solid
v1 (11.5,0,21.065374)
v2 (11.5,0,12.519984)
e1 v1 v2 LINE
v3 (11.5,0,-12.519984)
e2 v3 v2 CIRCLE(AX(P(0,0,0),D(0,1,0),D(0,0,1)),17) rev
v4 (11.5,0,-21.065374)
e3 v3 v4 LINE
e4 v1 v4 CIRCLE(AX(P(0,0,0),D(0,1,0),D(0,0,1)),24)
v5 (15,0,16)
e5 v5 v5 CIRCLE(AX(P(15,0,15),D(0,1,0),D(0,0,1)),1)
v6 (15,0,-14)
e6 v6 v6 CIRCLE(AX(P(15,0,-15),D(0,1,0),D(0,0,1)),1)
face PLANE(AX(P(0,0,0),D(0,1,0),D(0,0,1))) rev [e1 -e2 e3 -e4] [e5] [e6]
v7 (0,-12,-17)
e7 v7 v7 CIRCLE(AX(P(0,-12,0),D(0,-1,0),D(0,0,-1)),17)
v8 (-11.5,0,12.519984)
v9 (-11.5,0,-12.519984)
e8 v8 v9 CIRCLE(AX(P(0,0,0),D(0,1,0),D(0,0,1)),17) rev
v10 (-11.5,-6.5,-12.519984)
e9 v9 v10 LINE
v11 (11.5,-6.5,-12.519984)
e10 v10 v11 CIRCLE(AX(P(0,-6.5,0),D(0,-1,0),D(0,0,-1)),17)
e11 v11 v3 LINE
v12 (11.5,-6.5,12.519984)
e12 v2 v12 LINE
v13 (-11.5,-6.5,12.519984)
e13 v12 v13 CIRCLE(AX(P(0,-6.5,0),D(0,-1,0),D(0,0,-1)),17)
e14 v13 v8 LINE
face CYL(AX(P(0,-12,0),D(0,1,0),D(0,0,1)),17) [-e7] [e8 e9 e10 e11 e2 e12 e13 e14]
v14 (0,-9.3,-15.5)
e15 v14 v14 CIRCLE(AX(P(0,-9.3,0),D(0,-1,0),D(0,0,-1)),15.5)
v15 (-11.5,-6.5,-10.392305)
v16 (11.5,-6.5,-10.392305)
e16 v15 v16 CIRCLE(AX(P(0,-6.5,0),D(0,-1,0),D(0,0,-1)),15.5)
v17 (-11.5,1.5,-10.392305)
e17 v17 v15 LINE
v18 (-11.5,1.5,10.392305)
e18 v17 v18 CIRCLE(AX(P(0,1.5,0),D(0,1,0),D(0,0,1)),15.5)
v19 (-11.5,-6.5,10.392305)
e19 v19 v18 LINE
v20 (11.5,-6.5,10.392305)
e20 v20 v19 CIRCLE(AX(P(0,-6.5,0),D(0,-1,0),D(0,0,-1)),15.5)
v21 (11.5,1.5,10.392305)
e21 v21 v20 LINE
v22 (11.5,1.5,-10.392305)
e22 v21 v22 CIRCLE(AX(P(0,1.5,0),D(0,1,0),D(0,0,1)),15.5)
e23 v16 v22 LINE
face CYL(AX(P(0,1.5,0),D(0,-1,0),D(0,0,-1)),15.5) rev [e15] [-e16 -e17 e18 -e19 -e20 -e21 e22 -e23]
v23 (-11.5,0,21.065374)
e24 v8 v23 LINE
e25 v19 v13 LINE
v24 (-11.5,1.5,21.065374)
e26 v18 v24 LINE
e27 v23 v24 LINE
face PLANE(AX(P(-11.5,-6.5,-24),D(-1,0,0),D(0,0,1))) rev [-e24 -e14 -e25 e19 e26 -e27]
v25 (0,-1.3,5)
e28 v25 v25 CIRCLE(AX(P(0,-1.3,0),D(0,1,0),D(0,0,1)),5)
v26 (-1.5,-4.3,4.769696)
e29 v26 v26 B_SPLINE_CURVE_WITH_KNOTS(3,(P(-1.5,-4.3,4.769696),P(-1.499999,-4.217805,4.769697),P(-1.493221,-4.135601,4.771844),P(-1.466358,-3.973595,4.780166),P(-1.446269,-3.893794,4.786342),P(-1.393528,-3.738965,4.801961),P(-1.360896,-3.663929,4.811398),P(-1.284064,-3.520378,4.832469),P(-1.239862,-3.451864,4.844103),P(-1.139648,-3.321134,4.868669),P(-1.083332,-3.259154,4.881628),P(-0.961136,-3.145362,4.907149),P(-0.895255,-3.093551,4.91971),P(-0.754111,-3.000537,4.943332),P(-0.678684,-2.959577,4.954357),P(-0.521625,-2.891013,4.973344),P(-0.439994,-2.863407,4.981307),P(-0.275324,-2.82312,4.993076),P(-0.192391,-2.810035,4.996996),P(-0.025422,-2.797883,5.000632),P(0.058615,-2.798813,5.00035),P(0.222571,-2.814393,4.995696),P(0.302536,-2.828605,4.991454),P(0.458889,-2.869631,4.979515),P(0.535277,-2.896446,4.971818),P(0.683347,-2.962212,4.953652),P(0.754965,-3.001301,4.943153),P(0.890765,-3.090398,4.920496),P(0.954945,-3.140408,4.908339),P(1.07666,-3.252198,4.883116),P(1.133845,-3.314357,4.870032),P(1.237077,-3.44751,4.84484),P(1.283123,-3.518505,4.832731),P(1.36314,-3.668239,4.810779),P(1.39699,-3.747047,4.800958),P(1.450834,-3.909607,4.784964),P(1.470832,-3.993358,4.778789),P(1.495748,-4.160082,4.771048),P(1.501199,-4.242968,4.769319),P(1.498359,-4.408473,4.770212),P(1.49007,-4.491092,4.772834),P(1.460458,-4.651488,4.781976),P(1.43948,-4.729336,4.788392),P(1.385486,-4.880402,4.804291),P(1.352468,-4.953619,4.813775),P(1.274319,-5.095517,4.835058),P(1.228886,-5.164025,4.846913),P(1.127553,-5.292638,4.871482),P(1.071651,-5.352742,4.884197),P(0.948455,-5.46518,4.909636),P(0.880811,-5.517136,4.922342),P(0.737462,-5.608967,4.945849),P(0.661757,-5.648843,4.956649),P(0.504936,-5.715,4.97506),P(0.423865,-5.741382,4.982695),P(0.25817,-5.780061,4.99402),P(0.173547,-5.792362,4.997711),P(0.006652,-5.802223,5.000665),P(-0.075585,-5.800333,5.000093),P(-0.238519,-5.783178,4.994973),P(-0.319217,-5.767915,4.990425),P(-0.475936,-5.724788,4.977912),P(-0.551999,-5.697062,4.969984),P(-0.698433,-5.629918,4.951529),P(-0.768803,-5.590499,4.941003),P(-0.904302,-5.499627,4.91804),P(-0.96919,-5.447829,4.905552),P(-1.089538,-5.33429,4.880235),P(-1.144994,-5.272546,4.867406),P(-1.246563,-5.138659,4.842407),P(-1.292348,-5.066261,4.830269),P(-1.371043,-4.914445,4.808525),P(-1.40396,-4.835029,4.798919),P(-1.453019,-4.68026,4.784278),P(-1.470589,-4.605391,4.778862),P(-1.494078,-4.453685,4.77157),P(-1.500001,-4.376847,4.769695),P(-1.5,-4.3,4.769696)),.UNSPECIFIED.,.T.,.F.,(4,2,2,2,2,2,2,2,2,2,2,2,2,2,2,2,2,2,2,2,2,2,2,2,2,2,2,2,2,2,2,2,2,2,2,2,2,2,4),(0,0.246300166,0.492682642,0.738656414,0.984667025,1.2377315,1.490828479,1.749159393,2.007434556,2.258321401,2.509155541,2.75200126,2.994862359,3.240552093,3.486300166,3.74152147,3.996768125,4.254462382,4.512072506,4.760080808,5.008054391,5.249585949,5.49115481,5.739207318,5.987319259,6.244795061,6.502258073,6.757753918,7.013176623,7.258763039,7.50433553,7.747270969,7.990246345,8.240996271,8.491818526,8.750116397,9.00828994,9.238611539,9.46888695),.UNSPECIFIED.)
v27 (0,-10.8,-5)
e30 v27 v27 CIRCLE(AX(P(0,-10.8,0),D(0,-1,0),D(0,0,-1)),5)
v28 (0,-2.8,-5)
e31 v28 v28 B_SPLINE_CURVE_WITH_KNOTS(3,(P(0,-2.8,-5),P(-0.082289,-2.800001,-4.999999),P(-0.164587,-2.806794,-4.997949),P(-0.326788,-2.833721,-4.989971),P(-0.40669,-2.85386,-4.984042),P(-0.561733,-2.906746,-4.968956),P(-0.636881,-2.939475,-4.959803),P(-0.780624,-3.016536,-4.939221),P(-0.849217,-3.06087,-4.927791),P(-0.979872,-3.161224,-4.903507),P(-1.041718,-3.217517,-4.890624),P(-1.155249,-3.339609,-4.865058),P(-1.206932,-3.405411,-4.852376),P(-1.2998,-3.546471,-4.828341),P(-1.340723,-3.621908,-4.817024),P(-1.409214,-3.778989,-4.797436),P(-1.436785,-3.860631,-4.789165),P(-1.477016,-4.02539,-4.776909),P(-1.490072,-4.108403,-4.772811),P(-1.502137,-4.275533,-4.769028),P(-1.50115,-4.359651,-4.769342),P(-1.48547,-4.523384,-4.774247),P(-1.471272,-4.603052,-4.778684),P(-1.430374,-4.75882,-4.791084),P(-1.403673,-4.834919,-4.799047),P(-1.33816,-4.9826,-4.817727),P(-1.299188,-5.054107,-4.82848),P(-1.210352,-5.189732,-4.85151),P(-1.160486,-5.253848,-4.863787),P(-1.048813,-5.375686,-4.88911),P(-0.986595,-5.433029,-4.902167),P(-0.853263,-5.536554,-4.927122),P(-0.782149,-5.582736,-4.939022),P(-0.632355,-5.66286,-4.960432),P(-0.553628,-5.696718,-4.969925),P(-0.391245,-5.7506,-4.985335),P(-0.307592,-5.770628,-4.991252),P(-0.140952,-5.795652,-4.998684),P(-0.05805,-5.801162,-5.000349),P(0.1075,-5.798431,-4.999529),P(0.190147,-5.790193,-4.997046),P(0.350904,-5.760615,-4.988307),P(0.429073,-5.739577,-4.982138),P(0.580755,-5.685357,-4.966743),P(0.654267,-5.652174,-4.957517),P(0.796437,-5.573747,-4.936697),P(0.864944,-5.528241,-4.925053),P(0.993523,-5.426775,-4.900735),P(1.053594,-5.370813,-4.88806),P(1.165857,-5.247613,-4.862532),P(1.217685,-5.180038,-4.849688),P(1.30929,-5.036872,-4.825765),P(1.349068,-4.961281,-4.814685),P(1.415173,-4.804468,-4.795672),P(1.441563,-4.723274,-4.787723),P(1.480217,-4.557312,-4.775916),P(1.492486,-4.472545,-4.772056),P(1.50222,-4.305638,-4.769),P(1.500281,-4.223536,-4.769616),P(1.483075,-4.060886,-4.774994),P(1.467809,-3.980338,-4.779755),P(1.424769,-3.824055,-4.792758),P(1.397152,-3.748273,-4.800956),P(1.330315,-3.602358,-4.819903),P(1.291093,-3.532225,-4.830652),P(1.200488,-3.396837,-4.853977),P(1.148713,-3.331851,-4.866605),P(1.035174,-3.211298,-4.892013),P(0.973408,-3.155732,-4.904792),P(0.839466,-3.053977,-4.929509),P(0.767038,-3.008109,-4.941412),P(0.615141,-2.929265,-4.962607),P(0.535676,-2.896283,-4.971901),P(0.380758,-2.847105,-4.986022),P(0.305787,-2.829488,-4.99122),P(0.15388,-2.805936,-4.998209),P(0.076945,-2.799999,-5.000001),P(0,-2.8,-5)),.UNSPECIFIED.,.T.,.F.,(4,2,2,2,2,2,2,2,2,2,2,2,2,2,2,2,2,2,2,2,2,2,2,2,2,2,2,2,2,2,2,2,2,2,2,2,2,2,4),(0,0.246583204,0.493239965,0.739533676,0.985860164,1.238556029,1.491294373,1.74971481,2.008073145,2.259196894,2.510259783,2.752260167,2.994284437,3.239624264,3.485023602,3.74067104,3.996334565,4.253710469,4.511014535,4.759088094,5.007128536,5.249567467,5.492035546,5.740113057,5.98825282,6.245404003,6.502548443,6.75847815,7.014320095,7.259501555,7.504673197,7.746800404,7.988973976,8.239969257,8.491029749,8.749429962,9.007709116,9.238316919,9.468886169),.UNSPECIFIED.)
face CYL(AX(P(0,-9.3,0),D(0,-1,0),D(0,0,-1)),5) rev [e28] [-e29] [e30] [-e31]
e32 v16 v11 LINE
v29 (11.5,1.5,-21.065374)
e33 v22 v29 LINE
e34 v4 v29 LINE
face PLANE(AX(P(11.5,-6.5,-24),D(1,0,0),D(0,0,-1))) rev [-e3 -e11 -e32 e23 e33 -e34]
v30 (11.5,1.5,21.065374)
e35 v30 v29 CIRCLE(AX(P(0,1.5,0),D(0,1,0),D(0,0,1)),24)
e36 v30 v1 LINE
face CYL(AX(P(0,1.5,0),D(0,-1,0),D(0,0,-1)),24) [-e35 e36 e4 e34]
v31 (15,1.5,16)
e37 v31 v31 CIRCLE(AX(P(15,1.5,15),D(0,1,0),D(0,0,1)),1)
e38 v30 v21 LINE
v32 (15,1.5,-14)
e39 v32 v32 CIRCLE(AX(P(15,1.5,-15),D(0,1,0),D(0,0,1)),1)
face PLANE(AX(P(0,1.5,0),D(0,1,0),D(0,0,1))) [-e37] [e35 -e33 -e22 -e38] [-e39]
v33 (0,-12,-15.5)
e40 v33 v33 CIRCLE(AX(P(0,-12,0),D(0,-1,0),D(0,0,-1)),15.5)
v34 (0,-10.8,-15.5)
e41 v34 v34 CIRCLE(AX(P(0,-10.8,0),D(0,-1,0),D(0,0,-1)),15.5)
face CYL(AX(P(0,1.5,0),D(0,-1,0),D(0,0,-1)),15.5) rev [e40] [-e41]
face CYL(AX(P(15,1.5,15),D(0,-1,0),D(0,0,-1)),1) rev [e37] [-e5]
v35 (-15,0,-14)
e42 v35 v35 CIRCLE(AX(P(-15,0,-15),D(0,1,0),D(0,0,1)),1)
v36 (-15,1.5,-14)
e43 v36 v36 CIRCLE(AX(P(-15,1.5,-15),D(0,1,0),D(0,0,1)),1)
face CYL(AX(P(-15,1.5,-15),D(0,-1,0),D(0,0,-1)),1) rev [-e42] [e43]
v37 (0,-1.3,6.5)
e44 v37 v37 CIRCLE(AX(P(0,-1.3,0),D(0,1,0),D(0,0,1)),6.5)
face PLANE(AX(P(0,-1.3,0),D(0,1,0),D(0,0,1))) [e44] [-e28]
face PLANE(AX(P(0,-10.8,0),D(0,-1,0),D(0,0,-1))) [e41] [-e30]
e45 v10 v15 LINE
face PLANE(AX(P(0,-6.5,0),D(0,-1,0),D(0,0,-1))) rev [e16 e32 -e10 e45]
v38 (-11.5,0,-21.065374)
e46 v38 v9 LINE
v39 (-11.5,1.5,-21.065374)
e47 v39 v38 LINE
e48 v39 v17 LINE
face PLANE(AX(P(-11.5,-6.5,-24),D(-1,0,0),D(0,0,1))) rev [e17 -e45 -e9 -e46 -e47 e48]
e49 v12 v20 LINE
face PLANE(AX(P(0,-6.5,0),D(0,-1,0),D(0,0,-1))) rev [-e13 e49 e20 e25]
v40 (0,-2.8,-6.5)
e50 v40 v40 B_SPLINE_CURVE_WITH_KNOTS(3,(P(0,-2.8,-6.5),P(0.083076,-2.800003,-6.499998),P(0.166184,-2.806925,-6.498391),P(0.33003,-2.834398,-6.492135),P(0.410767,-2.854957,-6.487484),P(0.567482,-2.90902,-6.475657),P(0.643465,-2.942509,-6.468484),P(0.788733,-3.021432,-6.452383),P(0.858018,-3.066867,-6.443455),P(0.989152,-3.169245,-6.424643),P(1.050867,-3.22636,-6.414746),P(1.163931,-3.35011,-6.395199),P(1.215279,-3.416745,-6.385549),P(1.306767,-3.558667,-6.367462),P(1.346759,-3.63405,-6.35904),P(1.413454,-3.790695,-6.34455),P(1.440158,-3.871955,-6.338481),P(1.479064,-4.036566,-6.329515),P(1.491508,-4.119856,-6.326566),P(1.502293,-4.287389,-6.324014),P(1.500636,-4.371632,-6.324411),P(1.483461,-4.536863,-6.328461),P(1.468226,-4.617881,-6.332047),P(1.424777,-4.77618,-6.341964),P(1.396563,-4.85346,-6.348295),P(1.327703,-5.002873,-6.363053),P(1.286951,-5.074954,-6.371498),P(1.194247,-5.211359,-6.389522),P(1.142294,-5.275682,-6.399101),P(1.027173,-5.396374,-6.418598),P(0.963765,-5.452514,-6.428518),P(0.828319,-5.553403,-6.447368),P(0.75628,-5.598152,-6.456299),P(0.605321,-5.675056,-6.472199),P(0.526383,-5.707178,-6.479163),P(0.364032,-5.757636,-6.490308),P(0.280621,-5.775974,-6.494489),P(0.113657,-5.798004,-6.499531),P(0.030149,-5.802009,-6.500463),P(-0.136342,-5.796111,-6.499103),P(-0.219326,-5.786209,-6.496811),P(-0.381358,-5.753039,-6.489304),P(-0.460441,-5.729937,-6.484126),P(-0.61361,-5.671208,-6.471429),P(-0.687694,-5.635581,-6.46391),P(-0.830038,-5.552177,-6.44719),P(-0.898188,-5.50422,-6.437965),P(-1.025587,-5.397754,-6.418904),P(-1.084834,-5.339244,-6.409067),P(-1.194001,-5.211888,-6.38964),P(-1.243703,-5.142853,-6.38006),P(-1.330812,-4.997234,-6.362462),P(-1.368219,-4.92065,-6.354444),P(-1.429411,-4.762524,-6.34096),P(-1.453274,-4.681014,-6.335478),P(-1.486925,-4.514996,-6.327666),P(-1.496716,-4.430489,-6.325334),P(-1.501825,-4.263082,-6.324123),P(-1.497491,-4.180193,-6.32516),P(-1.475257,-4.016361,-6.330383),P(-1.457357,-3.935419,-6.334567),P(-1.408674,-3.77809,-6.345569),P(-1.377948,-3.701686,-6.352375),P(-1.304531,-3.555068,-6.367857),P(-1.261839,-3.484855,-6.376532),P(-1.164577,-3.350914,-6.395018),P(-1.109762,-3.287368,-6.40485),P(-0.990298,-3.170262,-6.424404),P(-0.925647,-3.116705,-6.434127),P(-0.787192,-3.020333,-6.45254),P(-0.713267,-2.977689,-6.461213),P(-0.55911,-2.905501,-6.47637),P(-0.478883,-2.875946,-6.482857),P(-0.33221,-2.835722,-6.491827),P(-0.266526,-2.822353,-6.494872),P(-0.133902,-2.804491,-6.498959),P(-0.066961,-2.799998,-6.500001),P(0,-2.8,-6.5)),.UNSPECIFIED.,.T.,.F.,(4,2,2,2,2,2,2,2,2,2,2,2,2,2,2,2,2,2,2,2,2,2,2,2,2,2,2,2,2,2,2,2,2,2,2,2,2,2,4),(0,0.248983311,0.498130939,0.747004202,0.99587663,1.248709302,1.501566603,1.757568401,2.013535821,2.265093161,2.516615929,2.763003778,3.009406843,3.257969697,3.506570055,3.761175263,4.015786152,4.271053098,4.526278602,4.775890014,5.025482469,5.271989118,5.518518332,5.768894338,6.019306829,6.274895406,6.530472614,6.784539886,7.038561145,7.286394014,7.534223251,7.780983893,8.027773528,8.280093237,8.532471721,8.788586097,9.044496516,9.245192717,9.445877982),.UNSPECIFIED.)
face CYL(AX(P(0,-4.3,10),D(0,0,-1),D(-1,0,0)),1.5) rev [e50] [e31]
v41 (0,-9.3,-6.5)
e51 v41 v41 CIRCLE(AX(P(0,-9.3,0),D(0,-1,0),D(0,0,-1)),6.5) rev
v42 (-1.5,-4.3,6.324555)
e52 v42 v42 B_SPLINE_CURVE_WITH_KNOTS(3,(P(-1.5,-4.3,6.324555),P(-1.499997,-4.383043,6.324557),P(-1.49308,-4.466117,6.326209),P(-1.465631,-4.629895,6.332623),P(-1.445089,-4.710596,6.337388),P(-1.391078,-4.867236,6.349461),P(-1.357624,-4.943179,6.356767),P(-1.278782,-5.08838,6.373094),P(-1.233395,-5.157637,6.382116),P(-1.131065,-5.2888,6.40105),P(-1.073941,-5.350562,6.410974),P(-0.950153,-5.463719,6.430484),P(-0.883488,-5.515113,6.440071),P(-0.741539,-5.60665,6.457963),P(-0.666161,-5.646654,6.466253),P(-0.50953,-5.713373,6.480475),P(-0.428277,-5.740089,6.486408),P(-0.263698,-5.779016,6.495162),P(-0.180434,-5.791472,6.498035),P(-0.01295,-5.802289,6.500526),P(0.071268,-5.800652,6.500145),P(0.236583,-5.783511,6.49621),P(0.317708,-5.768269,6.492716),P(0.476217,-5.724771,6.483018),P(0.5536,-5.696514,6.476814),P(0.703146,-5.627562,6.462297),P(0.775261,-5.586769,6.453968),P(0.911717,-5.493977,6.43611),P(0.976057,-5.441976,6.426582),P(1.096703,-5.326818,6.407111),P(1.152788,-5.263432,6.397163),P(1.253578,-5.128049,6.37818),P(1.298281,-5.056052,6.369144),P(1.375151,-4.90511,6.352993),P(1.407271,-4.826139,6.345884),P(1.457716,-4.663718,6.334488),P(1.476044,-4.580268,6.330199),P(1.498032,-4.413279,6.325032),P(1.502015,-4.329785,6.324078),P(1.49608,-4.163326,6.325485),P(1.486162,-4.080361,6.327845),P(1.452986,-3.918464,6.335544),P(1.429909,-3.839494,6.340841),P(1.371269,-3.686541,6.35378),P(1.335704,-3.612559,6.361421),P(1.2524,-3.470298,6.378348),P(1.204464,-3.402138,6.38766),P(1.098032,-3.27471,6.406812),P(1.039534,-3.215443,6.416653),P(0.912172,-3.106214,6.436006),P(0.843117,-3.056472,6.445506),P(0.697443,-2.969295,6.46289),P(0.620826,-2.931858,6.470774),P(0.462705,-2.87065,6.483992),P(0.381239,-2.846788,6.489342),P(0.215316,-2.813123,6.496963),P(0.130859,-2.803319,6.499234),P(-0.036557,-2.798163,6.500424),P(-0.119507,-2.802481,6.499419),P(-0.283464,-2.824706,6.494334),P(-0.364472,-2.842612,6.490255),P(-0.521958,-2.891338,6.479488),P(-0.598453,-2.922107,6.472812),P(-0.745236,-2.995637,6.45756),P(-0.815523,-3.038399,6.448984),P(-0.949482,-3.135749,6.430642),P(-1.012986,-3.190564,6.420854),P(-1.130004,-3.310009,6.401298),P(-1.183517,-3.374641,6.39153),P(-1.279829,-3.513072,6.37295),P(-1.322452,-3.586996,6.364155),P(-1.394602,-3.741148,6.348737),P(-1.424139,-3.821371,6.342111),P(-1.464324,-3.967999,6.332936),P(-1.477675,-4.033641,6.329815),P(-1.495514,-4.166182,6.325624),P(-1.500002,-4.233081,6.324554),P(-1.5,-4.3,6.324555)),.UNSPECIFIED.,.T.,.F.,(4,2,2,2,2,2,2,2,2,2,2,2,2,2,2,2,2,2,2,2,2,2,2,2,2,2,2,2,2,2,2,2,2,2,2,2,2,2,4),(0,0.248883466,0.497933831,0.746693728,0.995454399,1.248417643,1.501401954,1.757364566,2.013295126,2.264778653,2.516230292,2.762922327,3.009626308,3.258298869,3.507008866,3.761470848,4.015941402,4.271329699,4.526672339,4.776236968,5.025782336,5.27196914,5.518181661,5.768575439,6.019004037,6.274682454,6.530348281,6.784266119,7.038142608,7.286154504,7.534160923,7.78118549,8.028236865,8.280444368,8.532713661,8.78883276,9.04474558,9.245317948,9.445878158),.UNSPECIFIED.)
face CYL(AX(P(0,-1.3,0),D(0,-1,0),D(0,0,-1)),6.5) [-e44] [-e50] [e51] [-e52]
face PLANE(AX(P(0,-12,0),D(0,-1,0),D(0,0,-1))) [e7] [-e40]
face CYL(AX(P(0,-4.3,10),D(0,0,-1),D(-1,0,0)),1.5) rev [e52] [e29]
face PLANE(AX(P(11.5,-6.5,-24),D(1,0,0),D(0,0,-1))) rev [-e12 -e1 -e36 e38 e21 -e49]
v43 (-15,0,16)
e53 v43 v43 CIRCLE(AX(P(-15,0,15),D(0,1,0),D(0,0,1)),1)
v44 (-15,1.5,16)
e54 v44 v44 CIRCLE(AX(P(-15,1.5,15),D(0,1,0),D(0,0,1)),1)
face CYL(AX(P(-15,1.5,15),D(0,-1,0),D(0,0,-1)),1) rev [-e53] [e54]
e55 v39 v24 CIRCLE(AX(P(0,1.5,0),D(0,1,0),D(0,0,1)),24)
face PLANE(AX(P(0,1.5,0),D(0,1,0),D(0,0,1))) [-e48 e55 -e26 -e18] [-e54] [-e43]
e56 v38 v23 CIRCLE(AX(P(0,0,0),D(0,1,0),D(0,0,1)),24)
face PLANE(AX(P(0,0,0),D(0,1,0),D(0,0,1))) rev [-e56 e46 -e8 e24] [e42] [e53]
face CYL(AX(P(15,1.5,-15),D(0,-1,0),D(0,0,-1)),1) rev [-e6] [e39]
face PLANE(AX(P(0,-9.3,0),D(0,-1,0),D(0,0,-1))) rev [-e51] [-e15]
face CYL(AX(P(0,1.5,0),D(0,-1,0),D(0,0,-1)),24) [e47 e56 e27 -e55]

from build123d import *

# Parameters (mm, degrees)
SKETCH_2_R               = 24
SKETCH_2_R_2             = 15.5
SKETCH_2_R_3             = 1
EXTRUDE_1_DEPTH          = 1.5
EXTRUDE_START            = 12
SKETCH_4_R               = 17
SKETCH_4_R_2             = 15.5
EXTRUDE_3_DEPTH          = 12
EXTRUDE_START_2          = -1.2
SKETCH_5_R               = 17
SKETCH_5_R_2             = 5
EXTRUDE_4_DEPTH          = 1.5
SKETCH_6_W               = 23
SKETCH_6_H               = 48
CUT_EXTRUDE_1_DEPTH      = 8
SKETCH_7_R               = 6.5
SKETCH_7_R_2             = 5
EXTRUDE_5_DEPTH          = 8
CUT_EXTRUDE_2_DEPTH      = 10
CUT_EXTRUDE_2_DEPTH_BACK = 10
SKETCH_8_R               = 1.5


with BuildPart() as part:
    # 草图2 → 凸台-拉伸1 (new body)
    with BuildSketch(Plane(origin=(0, 0, 0), x_dir=(1, 0, 0), z_dir=(0, 1, 0))):
        Circle(SKETCH_2_R)
        Circle(SKETCH_2_R_2, mode=Mode.SUBTRACT)
        with Locations((-15, 15)):
            Circle(SKETCH_2_R_3, mode=Mode.SUBTRACT)
        with Locations((15, 15)):
            Circle(SKETCH_2_R_3, mode=Mode.SUBTRACT)
        with Locations((-15, -15)):
            Circle(SKETCH_2_R_3, mode=Mode.SUBTRACT)
        with Locations((15, -15)):
            Circle(SKETCH_2_R_3, mode=Mode.SUBTRACT)
    extrude(amount=EXTRUDE_1_DEPTH)

    # 草图4 → 凸台-拉伸3 (add)
    with BuildSketch(Plane.XZ.offset(EXTRUDE_START)):
        Circle(SKETCH_4_R)
        Circle(SKETCH_4_R_2, mode=Mode.SUBTRACT)
    extrude(amount=-EXTRUDE_3_DEPTH)

    # 草图5 → 凸台-拉伸4 (add)
    with BuildSketch(Plane.XZ.offset(12).offset(EXTRUDE_START_2)):
        Circle(SKETCH_5_R)
        Circle(SKETCH_5_R_2, mode=Mode.SUBTRACT)
    extrude(amount=-EXTRUDE_4_DEPTH)

    # 草图6 → 切除-拉伸1 (cut)
    with BuildSketch(Plane(origin=(0, 1.5, 0), x_dir=(1, 0, 0), z_dir=(0, 1, 0))):
        Rectangle(SKETCH_6_W, SKETCH_6_H)
    extrude(amount=-CUT_EXTRUDE_1_DEPTH, mode=Mode.SUBTRACT)

    # 草图7 → 凸台-拉伸5 (add)
    with BuildSketch(Plane(origin=(0, -9.3, 0), x_dir=(1, 0, 0), z_dir=(0, 1, 0))):
        Circle(SKETCH_7_R)
        Circle(SKETCH_7_R_2, mode=Mode.SUBTRACT)
    extrude(amount=EXTRUDE_5_DEPTH)

    # 草图8 → 切除-拉伸2 (cut, two sides: drawn at the far end of the back side and taken through both)
    with BuildSketch(Plane.XY.offset(-CUT_EXTRUDE_2_DEPTH_BACK)):
        with Locations((0, -4.3)):
            Circle(SKETCH_8_R)
    extrude(amount=CUT_EXTRUDE_2_DEPTH + CUT_EXTRUDE_2_DEPTH_BACK, mode=Mode.SUBTRACT)


solid = part.part
